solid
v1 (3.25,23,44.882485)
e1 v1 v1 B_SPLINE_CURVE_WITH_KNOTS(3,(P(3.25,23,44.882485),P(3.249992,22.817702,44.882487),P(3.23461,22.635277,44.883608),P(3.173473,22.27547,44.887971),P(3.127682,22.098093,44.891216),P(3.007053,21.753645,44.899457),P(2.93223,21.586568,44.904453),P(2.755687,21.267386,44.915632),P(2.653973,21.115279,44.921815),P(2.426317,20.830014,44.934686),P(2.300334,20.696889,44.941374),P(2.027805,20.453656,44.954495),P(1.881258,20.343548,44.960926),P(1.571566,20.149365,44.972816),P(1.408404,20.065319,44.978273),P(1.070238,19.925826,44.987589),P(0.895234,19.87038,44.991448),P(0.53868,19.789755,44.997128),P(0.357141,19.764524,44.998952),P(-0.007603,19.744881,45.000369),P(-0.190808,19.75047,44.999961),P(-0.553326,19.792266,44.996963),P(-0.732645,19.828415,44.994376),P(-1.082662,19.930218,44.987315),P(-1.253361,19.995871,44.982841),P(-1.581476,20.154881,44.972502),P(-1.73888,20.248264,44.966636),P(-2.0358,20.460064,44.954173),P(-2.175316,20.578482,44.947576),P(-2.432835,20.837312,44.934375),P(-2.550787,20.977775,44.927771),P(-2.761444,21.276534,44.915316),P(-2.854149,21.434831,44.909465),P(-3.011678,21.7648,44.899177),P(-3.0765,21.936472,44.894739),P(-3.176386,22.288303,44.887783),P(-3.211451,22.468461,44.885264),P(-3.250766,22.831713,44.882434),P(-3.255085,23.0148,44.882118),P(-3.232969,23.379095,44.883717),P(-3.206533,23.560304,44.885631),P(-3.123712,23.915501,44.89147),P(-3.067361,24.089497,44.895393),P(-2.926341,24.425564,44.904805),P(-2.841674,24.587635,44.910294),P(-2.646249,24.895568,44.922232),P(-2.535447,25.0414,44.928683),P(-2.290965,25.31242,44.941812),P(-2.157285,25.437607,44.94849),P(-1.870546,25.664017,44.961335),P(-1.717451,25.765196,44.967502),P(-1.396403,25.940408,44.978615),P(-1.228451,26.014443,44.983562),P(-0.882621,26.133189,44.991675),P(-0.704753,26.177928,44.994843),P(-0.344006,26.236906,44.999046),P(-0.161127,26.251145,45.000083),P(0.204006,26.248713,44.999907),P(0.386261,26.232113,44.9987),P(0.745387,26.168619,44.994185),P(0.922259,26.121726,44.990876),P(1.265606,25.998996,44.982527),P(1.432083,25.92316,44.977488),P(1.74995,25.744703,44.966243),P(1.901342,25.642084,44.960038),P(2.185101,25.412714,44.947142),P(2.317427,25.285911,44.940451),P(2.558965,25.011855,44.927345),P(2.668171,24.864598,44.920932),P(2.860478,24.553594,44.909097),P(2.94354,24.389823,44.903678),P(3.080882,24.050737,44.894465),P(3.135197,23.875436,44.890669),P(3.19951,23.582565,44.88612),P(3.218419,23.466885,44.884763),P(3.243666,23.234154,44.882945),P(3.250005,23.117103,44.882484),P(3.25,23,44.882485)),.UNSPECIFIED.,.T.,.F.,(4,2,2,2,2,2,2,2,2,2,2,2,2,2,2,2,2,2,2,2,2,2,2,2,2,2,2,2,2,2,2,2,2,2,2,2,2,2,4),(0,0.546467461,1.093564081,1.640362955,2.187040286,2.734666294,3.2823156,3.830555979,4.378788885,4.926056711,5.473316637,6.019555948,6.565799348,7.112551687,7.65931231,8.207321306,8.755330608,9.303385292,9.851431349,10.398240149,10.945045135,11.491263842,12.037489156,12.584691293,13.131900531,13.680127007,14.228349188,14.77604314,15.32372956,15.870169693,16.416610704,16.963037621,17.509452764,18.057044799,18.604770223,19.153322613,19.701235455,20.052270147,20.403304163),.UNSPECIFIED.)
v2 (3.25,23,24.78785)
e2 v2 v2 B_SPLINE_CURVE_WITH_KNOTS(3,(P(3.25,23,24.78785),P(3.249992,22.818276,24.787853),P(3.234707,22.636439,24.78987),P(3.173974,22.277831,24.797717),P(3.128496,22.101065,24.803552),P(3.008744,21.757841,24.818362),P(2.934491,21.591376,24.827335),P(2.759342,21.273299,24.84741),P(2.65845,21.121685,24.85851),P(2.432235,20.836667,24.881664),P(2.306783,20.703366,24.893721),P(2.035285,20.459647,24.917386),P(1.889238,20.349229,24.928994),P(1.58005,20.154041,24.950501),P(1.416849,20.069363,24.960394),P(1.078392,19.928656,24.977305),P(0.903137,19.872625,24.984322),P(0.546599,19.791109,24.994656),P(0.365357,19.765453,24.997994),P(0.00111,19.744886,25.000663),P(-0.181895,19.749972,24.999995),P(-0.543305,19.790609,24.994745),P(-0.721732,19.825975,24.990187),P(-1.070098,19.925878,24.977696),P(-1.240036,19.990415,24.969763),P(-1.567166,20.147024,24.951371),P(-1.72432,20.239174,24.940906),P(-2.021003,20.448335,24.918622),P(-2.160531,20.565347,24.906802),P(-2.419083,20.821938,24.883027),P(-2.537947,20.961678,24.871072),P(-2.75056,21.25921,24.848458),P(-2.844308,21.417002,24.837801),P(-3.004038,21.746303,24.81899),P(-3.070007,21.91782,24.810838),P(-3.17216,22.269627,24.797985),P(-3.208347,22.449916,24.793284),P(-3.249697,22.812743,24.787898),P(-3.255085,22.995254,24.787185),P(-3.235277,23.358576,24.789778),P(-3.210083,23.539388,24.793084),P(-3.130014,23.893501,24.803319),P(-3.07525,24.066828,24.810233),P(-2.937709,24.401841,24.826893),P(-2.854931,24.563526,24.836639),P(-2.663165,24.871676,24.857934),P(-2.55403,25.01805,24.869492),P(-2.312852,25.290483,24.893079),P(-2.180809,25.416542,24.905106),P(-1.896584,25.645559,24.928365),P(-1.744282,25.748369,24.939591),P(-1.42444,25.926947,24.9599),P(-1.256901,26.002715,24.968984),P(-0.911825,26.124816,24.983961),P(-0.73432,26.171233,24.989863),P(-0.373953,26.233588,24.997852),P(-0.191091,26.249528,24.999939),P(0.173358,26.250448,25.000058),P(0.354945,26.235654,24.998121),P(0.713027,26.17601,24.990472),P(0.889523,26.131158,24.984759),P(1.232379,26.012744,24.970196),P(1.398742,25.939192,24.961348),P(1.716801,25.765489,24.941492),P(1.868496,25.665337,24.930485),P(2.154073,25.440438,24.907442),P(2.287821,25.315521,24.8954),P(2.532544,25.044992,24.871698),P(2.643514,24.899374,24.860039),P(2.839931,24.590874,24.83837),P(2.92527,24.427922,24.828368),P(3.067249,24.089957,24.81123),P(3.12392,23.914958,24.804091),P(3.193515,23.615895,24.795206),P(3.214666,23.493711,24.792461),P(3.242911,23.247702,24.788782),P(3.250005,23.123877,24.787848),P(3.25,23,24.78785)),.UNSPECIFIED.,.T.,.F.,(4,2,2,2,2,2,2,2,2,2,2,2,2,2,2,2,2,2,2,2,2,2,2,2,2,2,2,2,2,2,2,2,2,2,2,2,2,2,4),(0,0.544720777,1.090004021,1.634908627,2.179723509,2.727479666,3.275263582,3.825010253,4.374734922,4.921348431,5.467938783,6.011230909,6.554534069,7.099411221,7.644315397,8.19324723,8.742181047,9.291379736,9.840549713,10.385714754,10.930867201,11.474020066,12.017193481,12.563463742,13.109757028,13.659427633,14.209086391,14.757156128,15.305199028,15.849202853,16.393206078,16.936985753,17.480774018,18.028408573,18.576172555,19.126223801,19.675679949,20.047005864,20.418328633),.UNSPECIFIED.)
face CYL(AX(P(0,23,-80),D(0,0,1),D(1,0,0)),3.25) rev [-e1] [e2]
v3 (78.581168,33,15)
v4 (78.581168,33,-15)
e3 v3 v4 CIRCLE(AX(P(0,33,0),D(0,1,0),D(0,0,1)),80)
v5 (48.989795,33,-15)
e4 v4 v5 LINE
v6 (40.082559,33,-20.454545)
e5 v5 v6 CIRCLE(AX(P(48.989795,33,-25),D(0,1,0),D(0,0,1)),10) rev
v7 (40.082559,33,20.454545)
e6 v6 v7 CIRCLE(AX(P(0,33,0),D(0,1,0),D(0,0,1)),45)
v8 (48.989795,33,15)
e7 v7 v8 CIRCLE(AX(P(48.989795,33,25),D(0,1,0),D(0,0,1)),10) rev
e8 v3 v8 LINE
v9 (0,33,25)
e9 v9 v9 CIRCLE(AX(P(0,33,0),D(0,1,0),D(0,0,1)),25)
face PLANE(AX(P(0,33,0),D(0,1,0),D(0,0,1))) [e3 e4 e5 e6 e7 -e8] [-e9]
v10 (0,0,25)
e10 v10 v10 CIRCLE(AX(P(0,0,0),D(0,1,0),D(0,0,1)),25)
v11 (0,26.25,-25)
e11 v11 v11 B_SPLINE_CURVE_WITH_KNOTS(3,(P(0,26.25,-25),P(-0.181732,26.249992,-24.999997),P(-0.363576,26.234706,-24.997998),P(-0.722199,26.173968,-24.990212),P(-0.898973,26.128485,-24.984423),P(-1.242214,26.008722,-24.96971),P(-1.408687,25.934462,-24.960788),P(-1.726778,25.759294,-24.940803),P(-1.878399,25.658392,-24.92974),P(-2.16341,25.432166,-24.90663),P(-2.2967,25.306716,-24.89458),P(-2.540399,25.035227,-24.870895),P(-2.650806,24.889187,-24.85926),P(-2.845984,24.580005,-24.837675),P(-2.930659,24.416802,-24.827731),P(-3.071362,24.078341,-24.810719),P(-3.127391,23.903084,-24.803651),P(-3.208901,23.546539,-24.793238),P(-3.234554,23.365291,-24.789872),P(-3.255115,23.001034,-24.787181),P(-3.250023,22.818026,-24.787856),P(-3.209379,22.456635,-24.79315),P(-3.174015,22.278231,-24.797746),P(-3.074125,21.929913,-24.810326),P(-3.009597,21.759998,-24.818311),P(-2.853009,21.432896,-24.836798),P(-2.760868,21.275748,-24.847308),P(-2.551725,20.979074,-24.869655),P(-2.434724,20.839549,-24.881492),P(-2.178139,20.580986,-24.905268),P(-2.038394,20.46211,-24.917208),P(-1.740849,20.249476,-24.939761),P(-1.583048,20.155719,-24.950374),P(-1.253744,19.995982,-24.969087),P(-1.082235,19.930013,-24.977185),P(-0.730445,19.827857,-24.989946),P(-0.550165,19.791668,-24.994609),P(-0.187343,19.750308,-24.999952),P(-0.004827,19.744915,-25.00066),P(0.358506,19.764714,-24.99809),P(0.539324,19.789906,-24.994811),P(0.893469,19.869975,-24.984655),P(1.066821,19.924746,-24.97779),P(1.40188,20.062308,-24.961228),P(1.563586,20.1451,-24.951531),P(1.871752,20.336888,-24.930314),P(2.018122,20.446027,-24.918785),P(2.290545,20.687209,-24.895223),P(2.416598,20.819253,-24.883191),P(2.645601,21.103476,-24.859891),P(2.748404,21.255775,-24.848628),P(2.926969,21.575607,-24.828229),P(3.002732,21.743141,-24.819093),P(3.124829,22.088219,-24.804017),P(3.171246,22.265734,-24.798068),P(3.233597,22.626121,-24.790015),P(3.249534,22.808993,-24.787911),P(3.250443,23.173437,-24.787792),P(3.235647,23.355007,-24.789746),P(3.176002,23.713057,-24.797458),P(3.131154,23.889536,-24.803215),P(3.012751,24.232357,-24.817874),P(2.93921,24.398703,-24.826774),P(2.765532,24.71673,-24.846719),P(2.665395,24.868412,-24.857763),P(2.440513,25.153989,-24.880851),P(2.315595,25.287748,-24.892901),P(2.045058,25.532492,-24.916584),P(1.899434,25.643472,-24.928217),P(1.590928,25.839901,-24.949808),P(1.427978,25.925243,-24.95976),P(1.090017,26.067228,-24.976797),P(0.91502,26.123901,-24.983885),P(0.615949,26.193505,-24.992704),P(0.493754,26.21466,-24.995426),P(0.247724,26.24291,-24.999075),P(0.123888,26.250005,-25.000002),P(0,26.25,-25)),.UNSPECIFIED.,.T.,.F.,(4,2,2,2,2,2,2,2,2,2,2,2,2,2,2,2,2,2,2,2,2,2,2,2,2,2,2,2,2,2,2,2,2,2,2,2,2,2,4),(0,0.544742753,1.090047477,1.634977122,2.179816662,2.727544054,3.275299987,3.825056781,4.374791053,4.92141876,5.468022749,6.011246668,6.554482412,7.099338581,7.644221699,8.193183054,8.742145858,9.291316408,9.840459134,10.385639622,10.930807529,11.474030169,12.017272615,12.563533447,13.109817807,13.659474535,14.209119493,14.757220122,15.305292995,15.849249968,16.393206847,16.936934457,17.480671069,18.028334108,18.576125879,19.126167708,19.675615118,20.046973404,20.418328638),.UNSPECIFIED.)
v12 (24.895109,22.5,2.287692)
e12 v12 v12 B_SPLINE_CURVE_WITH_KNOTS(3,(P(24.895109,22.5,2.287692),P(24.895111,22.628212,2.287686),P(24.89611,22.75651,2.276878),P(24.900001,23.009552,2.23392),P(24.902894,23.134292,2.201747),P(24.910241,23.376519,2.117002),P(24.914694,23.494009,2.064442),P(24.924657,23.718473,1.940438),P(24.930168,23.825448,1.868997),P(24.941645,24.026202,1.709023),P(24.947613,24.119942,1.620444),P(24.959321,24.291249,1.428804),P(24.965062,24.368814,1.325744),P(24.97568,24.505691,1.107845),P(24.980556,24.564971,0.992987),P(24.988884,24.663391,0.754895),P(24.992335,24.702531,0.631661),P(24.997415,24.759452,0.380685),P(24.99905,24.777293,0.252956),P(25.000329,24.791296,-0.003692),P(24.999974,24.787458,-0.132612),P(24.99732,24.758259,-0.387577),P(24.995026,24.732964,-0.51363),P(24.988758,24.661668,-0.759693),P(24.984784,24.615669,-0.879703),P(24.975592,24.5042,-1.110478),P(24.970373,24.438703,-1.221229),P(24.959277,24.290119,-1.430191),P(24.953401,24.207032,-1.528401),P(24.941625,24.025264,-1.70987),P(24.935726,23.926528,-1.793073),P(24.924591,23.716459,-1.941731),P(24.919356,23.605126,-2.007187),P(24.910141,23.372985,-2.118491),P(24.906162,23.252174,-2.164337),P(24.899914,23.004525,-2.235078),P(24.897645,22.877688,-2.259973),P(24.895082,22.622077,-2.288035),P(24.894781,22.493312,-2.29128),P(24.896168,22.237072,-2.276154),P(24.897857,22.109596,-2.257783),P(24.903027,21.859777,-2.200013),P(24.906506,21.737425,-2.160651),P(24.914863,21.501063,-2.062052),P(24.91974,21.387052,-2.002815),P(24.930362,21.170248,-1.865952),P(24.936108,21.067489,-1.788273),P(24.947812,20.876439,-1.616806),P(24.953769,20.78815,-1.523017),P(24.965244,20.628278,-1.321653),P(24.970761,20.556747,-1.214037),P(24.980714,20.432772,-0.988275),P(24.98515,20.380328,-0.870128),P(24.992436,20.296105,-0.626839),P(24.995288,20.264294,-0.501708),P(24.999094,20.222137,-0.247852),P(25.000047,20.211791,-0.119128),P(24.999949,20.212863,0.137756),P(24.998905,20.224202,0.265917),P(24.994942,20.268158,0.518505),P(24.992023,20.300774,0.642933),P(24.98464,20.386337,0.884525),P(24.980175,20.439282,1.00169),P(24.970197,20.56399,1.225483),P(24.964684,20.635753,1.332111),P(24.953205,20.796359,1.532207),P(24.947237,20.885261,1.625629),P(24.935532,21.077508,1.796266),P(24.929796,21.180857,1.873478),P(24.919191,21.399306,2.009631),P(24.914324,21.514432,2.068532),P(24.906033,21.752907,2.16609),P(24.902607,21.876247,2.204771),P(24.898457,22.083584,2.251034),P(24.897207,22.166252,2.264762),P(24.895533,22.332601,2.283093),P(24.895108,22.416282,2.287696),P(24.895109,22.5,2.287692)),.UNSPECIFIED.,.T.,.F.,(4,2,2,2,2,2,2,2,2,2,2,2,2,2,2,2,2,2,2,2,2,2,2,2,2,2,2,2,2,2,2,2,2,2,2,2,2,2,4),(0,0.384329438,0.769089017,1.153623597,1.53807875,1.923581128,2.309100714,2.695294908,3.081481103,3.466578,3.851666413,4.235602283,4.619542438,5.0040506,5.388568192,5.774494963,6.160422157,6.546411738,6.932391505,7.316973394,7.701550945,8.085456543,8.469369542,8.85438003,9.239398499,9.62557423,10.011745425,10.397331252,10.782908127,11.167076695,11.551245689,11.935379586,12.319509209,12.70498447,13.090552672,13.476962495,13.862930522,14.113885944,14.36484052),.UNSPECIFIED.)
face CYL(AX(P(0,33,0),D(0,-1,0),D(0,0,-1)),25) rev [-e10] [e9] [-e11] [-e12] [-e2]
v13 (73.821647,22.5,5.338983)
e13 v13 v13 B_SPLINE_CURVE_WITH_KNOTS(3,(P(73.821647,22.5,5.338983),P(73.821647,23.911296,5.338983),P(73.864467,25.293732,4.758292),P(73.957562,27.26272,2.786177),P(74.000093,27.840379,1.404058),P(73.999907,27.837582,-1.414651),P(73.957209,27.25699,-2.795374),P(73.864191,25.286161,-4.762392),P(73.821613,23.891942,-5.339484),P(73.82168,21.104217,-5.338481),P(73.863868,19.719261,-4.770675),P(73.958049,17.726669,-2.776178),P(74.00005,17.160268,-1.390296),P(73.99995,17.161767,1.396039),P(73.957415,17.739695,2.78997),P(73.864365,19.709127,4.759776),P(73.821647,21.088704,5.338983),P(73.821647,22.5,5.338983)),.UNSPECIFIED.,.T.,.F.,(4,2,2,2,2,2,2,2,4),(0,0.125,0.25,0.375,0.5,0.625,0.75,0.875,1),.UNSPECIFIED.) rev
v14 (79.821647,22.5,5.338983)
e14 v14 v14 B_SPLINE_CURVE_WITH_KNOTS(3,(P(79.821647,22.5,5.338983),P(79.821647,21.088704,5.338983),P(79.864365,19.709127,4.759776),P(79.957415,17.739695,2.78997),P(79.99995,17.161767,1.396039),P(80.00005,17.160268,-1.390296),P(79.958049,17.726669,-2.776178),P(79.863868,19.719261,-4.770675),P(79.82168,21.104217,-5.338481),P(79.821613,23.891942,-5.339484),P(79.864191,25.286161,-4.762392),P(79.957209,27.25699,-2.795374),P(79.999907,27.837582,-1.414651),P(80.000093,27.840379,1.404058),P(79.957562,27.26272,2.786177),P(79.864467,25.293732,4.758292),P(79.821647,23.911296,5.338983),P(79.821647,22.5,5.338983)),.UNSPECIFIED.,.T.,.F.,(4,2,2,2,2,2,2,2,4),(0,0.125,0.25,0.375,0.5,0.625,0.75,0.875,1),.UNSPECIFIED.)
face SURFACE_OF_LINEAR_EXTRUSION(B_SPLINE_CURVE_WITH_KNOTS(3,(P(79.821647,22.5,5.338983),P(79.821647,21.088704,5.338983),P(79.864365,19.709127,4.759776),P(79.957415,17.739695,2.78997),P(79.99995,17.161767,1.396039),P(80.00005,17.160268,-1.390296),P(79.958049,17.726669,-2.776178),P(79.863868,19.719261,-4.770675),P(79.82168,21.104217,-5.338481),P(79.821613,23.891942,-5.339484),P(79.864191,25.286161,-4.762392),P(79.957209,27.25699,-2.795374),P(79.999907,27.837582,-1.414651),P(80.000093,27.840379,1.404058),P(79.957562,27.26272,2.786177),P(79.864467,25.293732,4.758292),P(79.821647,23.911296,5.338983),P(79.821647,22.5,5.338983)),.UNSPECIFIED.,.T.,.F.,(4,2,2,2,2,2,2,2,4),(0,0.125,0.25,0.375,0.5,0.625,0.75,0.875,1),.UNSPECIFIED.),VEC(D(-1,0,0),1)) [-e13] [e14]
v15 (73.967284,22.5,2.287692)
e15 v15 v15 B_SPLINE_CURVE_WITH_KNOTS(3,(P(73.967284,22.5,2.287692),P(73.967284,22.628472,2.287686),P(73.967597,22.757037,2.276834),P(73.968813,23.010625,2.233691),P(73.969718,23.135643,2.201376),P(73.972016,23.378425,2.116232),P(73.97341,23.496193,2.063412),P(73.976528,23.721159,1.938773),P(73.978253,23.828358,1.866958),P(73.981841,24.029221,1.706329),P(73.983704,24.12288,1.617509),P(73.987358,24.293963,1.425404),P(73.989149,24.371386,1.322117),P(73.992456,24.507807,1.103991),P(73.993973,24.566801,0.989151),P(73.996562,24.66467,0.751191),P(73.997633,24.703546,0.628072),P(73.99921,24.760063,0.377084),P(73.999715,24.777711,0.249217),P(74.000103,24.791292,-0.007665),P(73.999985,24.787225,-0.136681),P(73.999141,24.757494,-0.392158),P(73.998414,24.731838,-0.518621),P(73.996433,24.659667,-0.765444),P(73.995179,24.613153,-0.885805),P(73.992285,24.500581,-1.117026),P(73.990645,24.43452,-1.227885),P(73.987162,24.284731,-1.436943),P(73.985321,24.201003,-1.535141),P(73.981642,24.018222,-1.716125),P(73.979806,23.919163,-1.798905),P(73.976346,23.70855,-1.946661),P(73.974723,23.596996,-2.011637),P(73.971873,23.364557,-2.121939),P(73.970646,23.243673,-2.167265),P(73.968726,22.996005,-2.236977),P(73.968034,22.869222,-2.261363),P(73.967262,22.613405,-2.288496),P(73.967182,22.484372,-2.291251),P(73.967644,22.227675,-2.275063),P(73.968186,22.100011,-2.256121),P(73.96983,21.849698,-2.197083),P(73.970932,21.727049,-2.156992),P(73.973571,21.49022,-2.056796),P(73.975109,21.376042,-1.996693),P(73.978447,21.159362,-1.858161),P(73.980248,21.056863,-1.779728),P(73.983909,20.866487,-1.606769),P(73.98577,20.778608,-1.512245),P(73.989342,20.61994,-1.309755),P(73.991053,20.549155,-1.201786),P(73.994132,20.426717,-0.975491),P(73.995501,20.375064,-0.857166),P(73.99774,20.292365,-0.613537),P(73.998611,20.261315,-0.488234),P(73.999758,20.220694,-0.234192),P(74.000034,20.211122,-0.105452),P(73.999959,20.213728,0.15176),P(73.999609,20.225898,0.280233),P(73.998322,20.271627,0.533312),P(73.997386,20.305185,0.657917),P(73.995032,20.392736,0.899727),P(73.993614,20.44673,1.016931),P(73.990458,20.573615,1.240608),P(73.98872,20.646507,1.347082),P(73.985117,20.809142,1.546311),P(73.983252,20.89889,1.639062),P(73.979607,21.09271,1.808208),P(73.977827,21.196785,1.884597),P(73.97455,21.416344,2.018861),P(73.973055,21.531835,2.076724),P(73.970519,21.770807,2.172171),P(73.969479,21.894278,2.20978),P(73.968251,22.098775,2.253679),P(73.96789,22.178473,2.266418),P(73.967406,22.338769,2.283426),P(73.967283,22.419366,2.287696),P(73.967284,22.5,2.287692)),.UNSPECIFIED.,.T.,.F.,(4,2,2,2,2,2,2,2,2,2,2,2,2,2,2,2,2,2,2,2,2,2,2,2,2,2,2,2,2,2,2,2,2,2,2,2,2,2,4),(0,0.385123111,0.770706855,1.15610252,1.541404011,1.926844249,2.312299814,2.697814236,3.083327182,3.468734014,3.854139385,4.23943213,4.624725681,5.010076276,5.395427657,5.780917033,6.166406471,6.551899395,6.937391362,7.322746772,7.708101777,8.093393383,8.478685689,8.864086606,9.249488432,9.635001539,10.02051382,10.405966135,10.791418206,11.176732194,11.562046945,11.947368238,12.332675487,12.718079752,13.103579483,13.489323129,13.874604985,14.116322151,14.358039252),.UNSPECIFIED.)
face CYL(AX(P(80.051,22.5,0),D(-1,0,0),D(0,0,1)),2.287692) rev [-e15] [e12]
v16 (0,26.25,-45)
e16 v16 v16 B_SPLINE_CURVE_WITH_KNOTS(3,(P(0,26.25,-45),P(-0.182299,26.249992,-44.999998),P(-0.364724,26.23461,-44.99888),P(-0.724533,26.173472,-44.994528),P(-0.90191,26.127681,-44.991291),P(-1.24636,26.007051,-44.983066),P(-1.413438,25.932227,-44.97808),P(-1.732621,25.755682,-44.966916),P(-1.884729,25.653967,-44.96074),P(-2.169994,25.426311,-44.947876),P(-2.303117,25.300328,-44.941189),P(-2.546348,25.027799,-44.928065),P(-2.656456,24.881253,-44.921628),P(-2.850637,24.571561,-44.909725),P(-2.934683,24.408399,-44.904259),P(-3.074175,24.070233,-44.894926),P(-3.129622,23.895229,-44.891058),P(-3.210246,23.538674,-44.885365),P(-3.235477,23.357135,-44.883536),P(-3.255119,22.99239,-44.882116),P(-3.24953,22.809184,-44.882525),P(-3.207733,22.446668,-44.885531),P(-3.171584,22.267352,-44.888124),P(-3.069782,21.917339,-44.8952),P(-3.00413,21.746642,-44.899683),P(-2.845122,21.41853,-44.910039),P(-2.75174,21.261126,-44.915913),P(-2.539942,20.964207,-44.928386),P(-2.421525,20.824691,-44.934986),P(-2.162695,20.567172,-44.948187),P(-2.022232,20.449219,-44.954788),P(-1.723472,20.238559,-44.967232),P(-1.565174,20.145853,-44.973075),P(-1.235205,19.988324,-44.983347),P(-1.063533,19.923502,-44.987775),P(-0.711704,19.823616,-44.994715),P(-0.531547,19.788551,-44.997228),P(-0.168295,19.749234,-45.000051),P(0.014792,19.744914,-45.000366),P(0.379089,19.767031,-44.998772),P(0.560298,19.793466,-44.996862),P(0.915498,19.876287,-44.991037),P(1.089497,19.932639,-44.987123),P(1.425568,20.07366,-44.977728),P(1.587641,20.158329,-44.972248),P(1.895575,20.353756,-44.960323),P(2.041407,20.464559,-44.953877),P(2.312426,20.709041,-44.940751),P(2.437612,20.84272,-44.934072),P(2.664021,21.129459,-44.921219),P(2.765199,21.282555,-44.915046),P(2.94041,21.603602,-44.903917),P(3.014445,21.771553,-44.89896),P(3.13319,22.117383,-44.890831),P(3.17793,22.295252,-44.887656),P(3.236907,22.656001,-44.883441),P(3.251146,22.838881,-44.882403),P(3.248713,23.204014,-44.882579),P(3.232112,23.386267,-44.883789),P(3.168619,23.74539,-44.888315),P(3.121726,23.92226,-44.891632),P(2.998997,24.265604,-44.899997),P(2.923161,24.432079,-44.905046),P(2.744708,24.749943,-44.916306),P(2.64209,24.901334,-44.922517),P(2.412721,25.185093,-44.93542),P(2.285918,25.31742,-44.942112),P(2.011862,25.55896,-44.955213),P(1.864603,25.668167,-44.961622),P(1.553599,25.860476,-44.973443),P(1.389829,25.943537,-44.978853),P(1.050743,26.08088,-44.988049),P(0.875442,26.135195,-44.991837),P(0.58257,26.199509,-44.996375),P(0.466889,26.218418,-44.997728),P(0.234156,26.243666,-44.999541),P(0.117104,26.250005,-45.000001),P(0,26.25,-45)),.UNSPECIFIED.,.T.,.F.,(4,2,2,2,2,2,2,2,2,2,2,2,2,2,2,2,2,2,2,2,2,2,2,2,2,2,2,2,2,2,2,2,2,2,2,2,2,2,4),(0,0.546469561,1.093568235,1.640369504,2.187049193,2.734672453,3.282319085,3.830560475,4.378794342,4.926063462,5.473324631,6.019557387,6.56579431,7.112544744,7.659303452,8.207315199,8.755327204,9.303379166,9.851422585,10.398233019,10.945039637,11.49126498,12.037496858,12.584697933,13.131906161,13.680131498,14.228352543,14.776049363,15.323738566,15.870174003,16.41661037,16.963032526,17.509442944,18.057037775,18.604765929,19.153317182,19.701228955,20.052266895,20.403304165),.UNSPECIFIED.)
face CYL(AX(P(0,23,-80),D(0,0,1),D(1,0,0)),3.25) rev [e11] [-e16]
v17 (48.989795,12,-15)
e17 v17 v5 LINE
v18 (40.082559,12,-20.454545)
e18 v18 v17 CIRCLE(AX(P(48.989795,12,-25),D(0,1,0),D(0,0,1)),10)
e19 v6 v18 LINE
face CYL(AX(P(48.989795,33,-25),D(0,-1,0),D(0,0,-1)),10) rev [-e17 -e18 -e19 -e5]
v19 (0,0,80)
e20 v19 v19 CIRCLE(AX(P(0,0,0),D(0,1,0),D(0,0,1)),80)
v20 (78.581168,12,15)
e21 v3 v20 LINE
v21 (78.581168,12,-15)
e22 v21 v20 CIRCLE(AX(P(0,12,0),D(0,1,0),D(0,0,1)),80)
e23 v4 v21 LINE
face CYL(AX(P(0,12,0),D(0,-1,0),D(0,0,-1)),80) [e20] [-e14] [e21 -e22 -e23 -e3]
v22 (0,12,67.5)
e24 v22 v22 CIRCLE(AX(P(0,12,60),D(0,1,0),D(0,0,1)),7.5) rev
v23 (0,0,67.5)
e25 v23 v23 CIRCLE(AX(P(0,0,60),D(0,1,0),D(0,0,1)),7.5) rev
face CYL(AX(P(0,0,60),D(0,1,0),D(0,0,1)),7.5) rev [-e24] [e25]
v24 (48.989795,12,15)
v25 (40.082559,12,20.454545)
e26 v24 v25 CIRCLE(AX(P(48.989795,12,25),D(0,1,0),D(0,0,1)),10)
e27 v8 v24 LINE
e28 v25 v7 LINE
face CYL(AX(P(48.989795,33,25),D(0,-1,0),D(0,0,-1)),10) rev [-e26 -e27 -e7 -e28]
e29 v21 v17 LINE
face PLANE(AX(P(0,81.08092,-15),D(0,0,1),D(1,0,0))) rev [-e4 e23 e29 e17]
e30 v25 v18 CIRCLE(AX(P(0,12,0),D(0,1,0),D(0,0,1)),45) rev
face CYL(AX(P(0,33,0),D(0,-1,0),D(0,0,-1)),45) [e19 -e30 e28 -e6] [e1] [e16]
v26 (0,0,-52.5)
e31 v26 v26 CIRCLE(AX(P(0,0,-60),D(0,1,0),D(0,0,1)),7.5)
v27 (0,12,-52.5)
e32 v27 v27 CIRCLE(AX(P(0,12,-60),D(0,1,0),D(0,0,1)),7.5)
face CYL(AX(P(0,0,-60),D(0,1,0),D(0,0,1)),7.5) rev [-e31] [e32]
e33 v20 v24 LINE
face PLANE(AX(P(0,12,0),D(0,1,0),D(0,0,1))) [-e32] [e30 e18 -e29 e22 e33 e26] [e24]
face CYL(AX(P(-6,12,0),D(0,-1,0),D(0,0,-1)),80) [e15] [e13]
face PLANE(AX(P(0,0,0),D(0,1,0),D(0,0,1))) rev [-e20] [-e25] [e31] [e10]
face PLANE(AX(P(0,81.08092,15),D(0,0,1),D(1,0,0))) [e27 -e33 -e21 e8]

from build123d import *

# Parameters (mm, degrees)
SKETCH_1_R               = 80
EXTRUDE_1_DEPTH          = 12
SKETCH_1_3_R             = 45
SKETCH_1_3_R_2           = 25
EXTRUDE_2_DEPTH          = 33
CUT_EXTRUDE_2_DEPTH      = 118.851601601
CUT_EXTRUDE_2_DEPTH_BACK = 118.851601601
SKETCH_1_4_R             = 25
SKETCH_3_R               = 7.5
CUT_EXTRUDE_3_DEPTH      = 116.06954419
CUT_EXTRUDE_4_DEPTH      = 118.851601601
CUT_EXTRUDE_4_DEPTH_BACK = 118.851601601
SKETCH_4_R               = 3.25
EXTRUDE_3_DEPTH          = 21
FILLET_1_R               = 10
CUT_EXTRUDE_START        = 73.821646461
CUT_EXTRUDE_5_DEPTH      = 7.178353539
CUT_EXTRUDE_START_2      = 16
CUT_EXTRUDE_5_2_DEPTH    = 13
CUT_EXTRUDE_9_REACH      = 119.852
CUT_EXTRUDE_9_END_RADIUS = 80


with BuildPart() as part:
    # 草图1 → 凸台-拉伸1 (new body)
    with BuildSketch(Plane(origin=(0, 0, 0), x_dir=(1, 0, 0), z_dir=(0, 1, 0))):
        with Locations(Location((0, 0, 0), (0, 0, 270))):
            Circle(SKETCH_1_R)
    extrude(amount=EXTRUDE_1_DEPTH)

    # 草图1<3> → 凸台-拉伸2 (add)
    with BuildSketch(Plane(origin=(0, 0, 0), x_dir=(1, 0, 0), z_dir=(0, 1, 0))):
        with Locations(Location((0, 0, 0), (0, 0, 270))):
            Circle(SKETCH_1_3_R)
        with Locations(Location((0, 0, 0), (0, 0, 270))):
            Circle(SKETCH_1_3_R_2, mode=Mode.SUBTRACT)
    extrude(amount=EXTRUDE_2_DEPTH)

    # 草图1<4> → 切除-拉伸2 (cut, two sides: drawn at the far end of the back side and taken through both)
    with BuildSketch(Plane(origin=(0, 0, 0), x_dir=(1, 0, 0), z_dir=(0, 1, 0)).offset(-CUT_EXTRUDE_2_DEPTH_BACK)):
        with Locations(Location((0, 0, 0), (0, 0, 270))):
            Circle(SKETCH_1_4_R)
    extrude(amount=CUT_EXTRUDE_2_DEPTH + CUT_EXTRUDE_2_DEPTH_BACK, mode=Mode.SUBTRACT)

    # 草图3 → 切除-拉伸3 (cut, through all)
    with BuildSketch(Plane(origin=(0, 12, 0), x_dir=(1, 0, 0), z_dir=(0, 1, 0))):
        with Locations(Location((0, 60, 0), (0, 0, 270))):
            Circle(SKETCH_3_R)
        with Locations(Location((0, -60, 0), (0, 0, 270))):
            Circle(SKETCH_3_R)
    extrude(amount=-CUT_EXTRUDE_3_DEPTH, mode=Mode.SUBTRACT)

    # 草图4 → 切除-拉伸4 (cut, two sides: drawn at the far end of the back side and taken through both)
    with BuildSketch(Plane.XY.offset(-CUT_EXTRUDE_4_DEPTH_BACK)):
        with Locations((0, 23)):
            Circle(SKETCH_4_R)
    extrude(amount=CUT_EXTRUDE_4_DEPTH + CUT_EXTRUDE_4_DEPTH_BACK, mode=Mode.SUBTRACT)

    # 草图6 → 凸台-拉伸3 (add)
    with BuildSketch(Plane(origin=(0, 12, 0), x_dir=(1, 0, 0), z_dir=(0, 1, 0))):
        with BuildLine():
            ThreePointArc((42.426406871, 15), (44.351935184, 7.609589043), (45, 0))
            Line((45, 0), (80, 0))
            ThreePointArc((80, 0), (79.64450219, 7.533476681), (78.581168228, 15))
            Line((78.581168228, 15), (42.426406871, 15))
        make_face()
        with BuildLine():
            Line((80, 0), (45, 0))
            ThreePointArc((45, 0), (44.351935184, -7.609589043), (42.426406871, -15))
            Line((42.426406871, -15), (78.581168228, -15))
            ThreePointArc((78.581168228, -15), (79.64450219, -7.533476681), (80, 0))
        make_face()
    extrude(amount=EXTRUDE_3_DEPTH)

    # 圆角1
    fillet_1_edges = [part.edges().sort_by_distance(p)[0] for p in [
        (42.426406871, 22.5, 15),
        (42.426406871, 22.5, -15),
    ]]
    fillet(fillet_1_edges, radius=FILLET_1_R)

    # 切除-拉伸5: read off the stored shape, not the designer's step
    # 切除-拉伸5 outline → 切除-拉伸5 (cut)
    with BuildSketch(Plane(origin=(0, 0, 0), x_dir=(0, 0, -1), z_dir=(1, 0, 0)).offset(CUT_EXTRUDE_START)):
        with BuildLine():
            add(Edge.make_bspline(
                [(-5.338983078, 22.5), (-5.338983078, 21.088703826), (-4.759775949, 19.709126885), (-2.789970131, 17.739694705), (-1.396039111, 17.161767053), (1.390295629, 17.160268335), (2.776177958, 17.726669289), (4.77067497, 19.719260807), (5.338481287, 21.104216537), (5.339484178, 23.891942041), (4.762391942, 25.286161316), (2.795373983, 27.256990244), (1.41465075, 27.837582336), (-1.404057944, 27.840378566), (-2.786176586, 27.262719547), (-4.758291506, 25.293732162), (-5.338983078, 23.911296174), (-5.338983078, 22.5)],
                knots=[0, 0, 0, 0, 0.125, 0.125, 0.25, 0.25, 0.375, 0.375, 0.5, 0.5, 0.625, 0.625, 0.75, 0.75, 0.875, 0.875, 1, 1, 1, 1], degree=3))
        make_face()
    extrude(amount=CUT_EXTRUDE_5_DEPTH, mode=Mode.SUBTRACT)

    # Cut-Extrude 5 2 outline → Cut-Extrude 5 2 (add)
    with BuildSketch(Plane(origin=(0, 0, 0), x_dir=(1, 0, 0), z_dir=(0, 1, 0)).offset(CUT_EXTRUDE_START_2)):
        with BuildLine():
            ThreePointArc((73.821646533, -5.338983493), (74, -1.64e-07), (73.821646555, 5.338983165))
            Line((73.821646555, 5.338983165), (73.821646533, -5.338983493))
        make_face()
    extrude(amount=CUT_EXTRUDE_5_2_DEPTH)

    # 切除-拉伸9: up to this cylinder (the profile starts inside it)
    cut_extrude_9_end = Plane(origin=(-6, 22.5, 0), z_dir=(0, -1, 0)) * Cylinder(CUT_EXTRUDE_9_END_RADIUS, 400.704, mode=Mode.PRIVATE)
    # 草图8<6> → 切除-拉伸9 (cut, up to the surface)
    with BuildSketch(Plane(origin=(0, 0, 0), x_dir=(0, 0, -1), z_dir=(1, 0, 0)), mode=Mode.PRIVATE) as cut_extrude_9_sk1:
        with BuildLine():
            Line((0, 20.21230794), (0, 22.5))
            Line((0, 22.5), (0, 24.78769206))
            ThreePointArc((0, 24.78769206), (-2.28769206, 22.5), (0, 20.21230794))
        make_face()
    cut_extrude_9_tool1 = extrude(cut_extrude_9_sk1.sketch, amount=CUT_EXTRUDE_9_REACH, mode=Mode.PRIVATE) & cut_extrude_9_end
    add(cut_extrude_9_tool1.solids().sort_by_distance((0, 22.5, 0.970927))[0], mode=Mode.SUBTRACT)
    # 草图8<6> → 切除-拉伸9 (cut, up to the surface)
    with BuildSketch(Plane(origin=(0, 0, 0), x_dir=(0, 0, -1), z_dir=(1, 0, 0)), mode=Mode.PRIVATE) as cut_extrude_9_sk2:
        with BuildLine():
            Line((0, 24.78769206), (0, 22.5))
            Line((0, 22.5), (0, 20.21230794))
            ThreePointArc((0, 20.21230794), (1.617642569, 20.882357431), (2.28769206, 22.5))
            ThreePointArc((2.28769206, 22.5), (1.617642569, 24.117642569), (0, 24.78769206))
        make_face()
    cut_extrude_9_tool2 = extrude(cut_extrude_9_sk2.sketch, amount=CUT_EXTRUDE_9_REACH, mode=Mode.PRIVATE) & cut_extrude_9_end
    add(cut_extrude_9_tool2.solids().sort_by_distance((0, 22.5, -0.970927))[0], mode=Mode.SUBTRACT)
    # 草图8<6> → 切除-拉伸9 (cut, up to the surface)
    with BuildSketch(Plane(origin=(0, 0, 0), x_dir=(0, 0, -1), z_dir=(1, 0, 0)), mode=Mode.PRIVATE) as cut_extrude_9_sk3:
        with BuildLine():
            Line((0, 20.21230794), (0, 22.5))
            Line((0, 22.5), (0, 24.78769206))
            ThreePointArc((0, 24.78769206), (-2.28769206, 22.5), (0, 20.21230794))
        make_face()
    cut_extrude_9_tool3 = extrude(cut_extrude_9_sk3.sketch, amount=CUT_EXTRUDE_9_REACH, mode=Mode.PRIVATE) & cut_extrude_9_end
    add(cut_extrude_9_tool3.solids().sort_by_distance((0, 22.5, 0.970927))[0], mode=Mode.SUBTRACT)
    # 草图8<6> → 切除-拉伸9 (cut, up to the surface)
    with BuildSketch(Plane(origin=(0, 0, 0), x_dir=(0, 0, -1), z_dir=(1, 0, 0)), mode=Mode.PRIVATE) as cut_extrude_9_sk4:
        with BuildLine():
            Line((0, 24.78769206), (0, 22.5))
            Line((0, 22.5), (0, 20.21230794))
            ThreePointArc((0, 20.21230794), (1.617642569, 20.882357431), (2.28769206, 22.5))
            ThreePointArc((2.28769206, 22.5), (1.617642569, 24.117642569), (0, 24.78769206))
        make_face()
    cut_extrude_9_tool4 = extrude(cut_extrude_9_sk4.sketch, amount=CUT_EXTRUDE_9_REACH, mode=Mode.PRIVATE) & cut_extrude_9_end
    add(cut_extrude_9_tool4.solids().sort_by_distance((0, 22.5, -0.970927))[0], mode=Mode.SUBTRACT)


solid = part.part
